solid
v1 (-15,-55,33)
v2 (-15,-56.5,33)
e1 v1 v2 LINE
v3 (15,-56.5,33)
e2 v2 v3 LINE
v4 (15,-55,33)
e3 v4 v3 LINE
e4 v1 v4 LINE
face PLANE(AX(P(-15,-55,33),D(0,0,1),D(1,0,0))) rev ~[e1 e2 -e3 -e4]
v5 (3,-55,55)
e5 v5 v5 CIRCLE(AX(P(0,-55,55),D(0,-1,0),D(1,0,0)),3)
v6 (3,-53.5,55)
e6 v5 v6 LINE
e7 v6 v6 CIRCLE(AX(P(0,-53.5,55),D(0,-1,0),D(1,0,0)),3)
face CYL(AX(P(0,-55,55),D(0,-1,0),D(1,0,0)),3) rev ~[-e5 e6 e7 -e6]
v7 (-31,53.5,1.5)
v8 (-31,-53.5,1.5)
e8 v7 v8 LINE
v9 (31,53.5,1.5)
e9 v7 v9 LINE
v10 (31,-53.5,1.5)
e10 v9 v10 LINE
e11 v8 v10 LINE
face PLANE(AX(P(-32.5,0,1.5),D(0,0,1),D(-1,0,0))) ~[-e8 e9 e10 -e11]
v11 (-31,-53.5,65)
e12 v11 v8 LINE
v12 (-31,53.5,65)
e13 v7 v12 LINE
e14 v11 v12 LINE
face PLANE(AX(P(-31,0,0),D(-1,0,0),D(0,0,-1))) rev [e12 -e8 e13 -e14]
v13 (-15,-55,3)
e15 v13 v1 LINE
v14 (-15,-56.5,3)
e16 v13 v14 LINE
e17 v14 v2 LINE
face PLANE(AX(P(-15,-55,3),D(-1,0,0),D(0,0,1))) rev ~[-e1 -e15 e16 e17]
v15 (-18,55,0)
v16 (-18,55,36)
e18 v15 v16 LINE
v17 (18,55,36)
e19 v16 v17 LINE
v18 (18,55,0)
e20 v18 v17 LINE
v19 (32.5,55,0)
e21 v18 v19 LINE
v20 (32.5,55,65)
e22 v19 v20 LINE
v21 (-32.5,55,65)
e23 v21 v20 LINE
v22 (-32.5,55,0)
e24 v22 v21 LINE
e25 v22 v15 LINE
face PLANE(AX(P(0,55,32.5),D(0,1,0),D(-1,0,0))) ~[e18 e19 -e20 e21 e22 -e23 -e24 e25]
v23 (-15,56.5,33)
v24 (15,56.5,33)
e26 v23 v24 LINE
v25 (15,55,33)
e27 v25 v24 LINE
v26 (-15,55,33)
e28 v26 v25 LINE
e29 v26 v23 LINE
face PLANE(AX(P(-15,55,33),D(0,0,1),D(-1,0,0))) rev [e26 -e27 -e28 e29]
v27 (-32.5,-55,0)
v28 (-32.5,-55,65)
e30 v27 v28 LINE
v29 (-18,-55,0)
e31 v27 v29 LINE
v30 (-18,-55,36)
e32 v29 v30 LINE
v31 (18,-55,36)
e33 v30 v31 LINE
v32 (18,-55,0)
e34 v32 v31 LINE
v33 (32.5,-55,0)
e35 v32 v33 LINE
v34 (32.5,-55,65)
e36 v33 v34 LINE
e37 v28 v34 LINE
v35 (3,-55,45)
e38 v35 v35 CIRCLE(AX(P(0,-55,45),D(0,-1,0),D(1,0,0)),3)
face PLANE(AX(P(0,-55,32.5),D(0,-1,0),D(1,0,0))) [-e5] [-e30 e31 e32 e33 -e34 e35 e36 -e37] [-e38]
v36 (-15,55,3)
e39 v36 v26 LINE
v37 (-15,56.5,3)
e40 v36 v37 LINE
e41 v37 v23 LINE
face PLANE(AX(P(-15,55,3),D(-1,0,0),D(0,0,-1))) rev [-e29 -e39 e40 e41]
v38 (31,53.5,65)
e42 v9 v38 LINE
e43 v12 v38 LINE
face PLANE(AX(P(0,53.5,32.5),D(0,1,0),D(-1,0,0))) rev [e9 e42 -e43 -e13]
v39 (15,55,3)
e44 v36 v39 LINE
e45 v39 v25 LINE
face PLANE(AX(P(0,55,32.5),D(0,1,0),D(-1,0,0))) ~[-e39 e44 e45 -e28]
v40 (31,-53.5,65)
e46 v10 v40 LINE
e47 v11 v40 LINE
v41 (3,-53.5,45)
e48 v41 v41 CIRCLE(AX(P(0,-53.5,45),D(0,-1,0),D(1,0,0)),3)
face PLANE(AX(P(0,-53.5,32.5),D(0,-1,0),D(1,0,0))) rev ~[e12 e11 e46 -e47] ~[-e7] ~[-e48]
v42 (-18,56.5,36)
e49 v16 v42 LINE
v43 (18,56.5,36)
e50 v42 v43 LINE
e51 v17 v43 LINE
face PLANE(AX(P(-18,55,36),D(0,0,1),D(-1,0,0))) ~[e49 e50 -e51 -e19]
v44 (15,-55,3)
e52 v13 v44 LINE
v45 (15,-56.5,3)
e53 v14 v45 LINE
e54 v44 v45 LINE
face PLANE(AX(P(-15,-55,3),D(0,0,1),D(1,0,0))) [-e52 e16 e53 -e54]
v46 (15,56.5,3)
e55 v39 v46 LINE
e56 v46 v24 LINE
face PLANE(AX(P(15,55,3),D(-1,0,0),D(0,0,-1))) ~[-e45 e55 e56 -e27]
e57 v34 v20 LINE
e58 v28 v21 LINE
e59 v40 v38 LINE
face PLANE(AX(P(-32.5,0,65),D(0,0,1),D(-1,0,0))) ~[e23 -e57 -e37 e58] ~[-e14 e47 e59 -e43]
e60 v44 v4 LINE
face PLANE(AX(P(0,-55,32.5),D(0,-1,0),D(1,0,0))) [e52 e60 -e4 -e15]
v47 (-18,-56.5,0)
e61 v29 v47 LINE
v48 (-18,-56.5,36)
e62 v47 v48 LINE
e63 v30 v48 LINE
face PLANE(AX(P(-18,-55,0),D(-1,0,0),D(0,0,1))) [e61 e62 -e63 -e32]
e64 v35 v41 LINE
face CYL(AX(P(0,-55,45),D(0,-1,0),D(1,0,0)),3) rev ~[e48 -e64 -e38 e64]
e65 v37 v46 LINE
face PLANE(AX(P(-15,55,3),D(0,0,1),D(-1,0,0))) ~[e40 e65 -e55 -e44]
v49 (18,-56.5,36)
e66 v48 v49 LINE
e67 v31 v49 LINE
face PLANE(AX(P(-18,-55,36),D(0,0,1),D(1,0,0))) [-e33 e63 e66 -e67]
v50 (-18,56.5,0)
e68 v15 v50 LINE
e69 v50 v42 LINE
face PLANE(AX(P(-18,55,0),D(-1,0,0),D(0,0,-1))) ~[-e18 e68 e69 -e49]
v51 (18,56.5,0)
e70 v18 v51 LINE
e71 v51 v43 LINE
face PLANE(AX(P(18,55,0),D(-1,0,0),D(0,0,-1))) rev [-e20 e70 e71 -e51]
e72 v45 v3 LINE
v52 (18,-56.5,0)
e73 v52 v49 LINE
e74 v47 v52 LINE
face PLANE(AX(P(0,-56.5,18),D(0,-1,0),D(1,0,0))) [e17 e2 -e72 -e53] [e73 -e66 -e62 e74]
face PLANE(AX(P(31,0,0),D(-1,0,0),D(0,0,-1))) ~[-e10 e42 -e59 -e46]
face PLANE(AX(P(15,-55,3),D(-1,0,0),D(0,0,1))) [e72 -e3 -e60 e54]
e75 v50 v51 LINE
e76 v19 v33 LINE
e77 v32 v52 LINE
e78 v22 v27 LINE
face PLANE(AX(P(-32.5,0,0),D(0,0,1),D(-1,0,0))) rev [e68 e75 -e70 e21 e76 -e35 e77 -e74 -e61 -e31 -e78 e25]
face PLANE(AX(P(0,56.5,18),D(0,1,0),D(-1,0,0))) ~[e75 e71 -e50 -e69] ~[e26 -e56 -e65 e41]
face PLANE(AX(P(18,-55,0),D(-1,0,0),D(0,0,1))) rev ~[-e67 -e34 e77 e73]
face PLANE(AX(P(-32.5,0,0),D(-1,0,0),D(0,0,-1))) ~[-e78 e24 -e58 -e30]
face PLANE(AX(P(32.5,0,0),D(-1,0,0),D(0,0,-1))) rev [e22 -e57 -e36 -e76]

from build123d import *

# Parameters (mm, degrees)
F0_W         = 65
F0_H         = 65
F1_DEPTH     = 55
F2_W         = 36
F2_H         = 36
F2_W_2       = 30
F2_H_2       = 30
F3_DEPTH     = 1.5
F5_T         = 1.5
F5_T3_DEPTH  = 39
F5_T5_DEPTH  = 39
F5_T7_DEPTH  = 4.5
F5_T9_DEPTH  = 33
F5_T11_DEPTH = 33
F5_T13_DEPTH = 4.5
F6_R         = 3
F7_DEPTH     = 1.5


# Not quite as in the source:
# - a shell that OpenCascade refuses in one call is made with other operations: the cavity is built on its own and cut out


with BuildPart() as f1:
    # F0 (on Front) → F1 (new body)
    with BuildSketch(Plane.XZ):
        with Locations((0, 32.5)):
            Rectangle(F0_W, F0_H)
    extrude(amount=F1_DEPTH)

    # F2 (on face) → F3 (join)
    with BuildSketch(Plane.XZ.offset(55)):
        with Locations((0, 18)):
            Rectangle(F2_W, F2_H)
        with Locations((0, 18)):
            Rectangle(F2_W_2, F2_H_2, mode=Mode.SUBTRACT)
    extrude(amount=F3_DEPTH)

    # F4: F1 across plane


with BuildPart() as f1_1:
    add(f1.part)
    add(f1.part.mirror(Plane.XZ))

    # F5: shell of thickness 1.5, made by hand


with BuildPart() as f5_core1:
    # F5_t2: copy of F1
    add(f1_1.part)

    # the walls: a layer under each face that stays
    f5_faces = [f5_core1.faces().sort_by_distance(p)[0] for p in [
        (-21.6666666667, 55, 10.8333333333),
        (-18, 55.75, 18),
        (-15.4285714286, 56.5, 2.5714285714),
        (0, 55.75, 3),
        (0, 55, 18),
        (15, 55.75, 18),
        (0, 55.75, 33),
        (-15, 55.75, 18),
        (0, 55.75, 36),
        (18, 55.75, 18),
        (0, 0, 0),
        (18, -55.75, 18),
        (0, -55.75, 36),
        (-15.4285714286, -56.5, 2.5714285714),
        (0, -55.75, 3),
        (0, -55, 18),
        (15, -55.75, 18),
        (0, -55.75, 33),
        (-15, -55.75, 18),
        (-18, -55.75, 18),
        (-32.5, 0, 32.5),
        (-21.6666666667, -55, 10.8333333333),
        (32.5, 0, 32.5),
    ]]
    thicken(f5_faces, amount=-F5_T, mode=Mode.SUBTRACT)

    # F5_s4 → F5_t3 (cut)
    with BuildSketch(Plane.XY.offset(-1.5)):
        Polygon((18.015, 55.015), (18, 53.5), (16.5, 53.5), (16.5, 55), align=None)
        Polygon((-18.015, 55.015), (-18, 53.5), (-16.5, 53.5), (-16.5, 55), align=None)
        Polygon((18.015, -55.015), (16.5, -55), (16.5, -53.5), (18, -53.5), align=None)
        Polygon((-18.015, -55.015), (-16.5, -55), (-16.5, -53.5), (-18, -53.5), align=None)
    extrude(amount=F5_T3_DEPTH, mode=Mode.SUBTRACT)

    # F5_s6 → F5_t5 (cut)
    with BuildSketch(Plane.YZ.offset(-19.5)):
        Polygon((55.015, 36.015), (53.5, 36), (53.5, 34.5), (55, 34.5), align=None)
        Polygon((-55.015, 36.015), (-55, 34.5), (-53.5, 34.5), (-53.5, 36), align=None)
    extrude(amount=F5_T5_DEPTH, mode=Mode.SUBTRACT)

    # F5_s8 → F5_t7 (cut)
    with BuildSketch(Plane.XZ.offset(-58)):
        Polygon((14.985, 3.015), (15, 1.5), (16.5, 1.5), (16.5, 3), align=None)
        Polygon((-14.985, 3.015), (-15, 1.5), (-16.5, 1.5), (-16.5, 3), align=None)
        Polygon((14.985, 32.985), (16.5, 33), (16.5, 34.5), (15, 34.5), align=None)
        Polygon((-14.985, 32.985), (-15, 34.5), (-16.5, 34.5), (-16.5, 33), align=None)
    extrude(amount=F5_T7_DEPTH, mode=Mode.SUBTRACT)

    # F5_s10 → F5_t9 (cut)
    with BuildSketch(Plane.YZ.offset(-16.5)):
        Polygon((55.015, 3.015), (55, 1.5), (53.5, 1.5), (53.5, 3), align=None)
        Polygon((55.015, 32.985), (53.5, 33), (53.5, 34.5), (55, 34.5), align=None)
        Polygon((-55.015, 3.015), (-55, 1.5), (-53.5, 1.5), (-53.5, 3), align=None)
        Polygon((-55.015, 32.985), (-53.5, 33), (-53.5, 34.5), (-55, 34.5), align=None)
    extrude(amount=F5_T9_DEPTH, mode=Mode.SUBTRACT)

    # F5_s12 → F5_t11 (cut)
    with BuildSketch(Plane.XY.offset(1.5)):
        Polygon((-14.985, 55.015), (-15, 53.5), (-16.5, 53.5), (-16.5, 55), align=None)
        Polygon((14.985, 55.015), (15, 53.5), (16.5, 53.5), (16.5, 55), align=None)
        Polygon((-14.985, -55.015), (-15, -53.5), (-16.5, -53.5), (-16.5, -55), align=None)
        Polygon((14.985, -55.015), (15, -53.5), (16.5, -53.5), (16.5, -55), align=None)
    extrude(amount=F5_T11_DEPTH, mode=Mode.SUBTRACT)

    # F5_s14 → F5_t13 (cut)
    with BuildSketch(Plane.XZ.offset(53.5)):
        Polygon((14.985, 3.015), (15, 1.5), (16.5, 1.5), (16.5, 3), align=None)
        Polygon((-14.985, 3.015), (-15, 1.5), (-16.5, 1.5), (-16.5, 3), align=None)
        Polygon((14.985, 32.985), (16.5, 33), (16.5, 34.5), (15, 34.5), align=None)
        Polygon((-14.985, 32.985), (-15, 34.5), (-16.5, 34.5), (-16.5, 33), align=None)
    extrude(amount=F5_T13_DEPTH, mode=Mode.SUBTRACT)


with BuildPart() as f1_2:
    add(f1_1.part)

    # what is left inside the walls is the cavity
    f5_cavity = [f5_core1.part.solids().sort_by_distance(p)[0] for p in [
        (-30.985, -17.833333, 33.25),
    ]]
    add(f5_cavity, mode=Mode.SUBTRACT)

    # F6 (on face) → F7 (cut, through all)
    with BuildSketch(Plane.XZ.offset(55)):
        with Locations((0, 55)):
            Circle(F6_R)
        with Locations((0, 45)):
            Circle(F6_R)
    extrude(amount=-F7_DEPTH, mode=Mode.SUBTRACT)


solid = f1_2.part
